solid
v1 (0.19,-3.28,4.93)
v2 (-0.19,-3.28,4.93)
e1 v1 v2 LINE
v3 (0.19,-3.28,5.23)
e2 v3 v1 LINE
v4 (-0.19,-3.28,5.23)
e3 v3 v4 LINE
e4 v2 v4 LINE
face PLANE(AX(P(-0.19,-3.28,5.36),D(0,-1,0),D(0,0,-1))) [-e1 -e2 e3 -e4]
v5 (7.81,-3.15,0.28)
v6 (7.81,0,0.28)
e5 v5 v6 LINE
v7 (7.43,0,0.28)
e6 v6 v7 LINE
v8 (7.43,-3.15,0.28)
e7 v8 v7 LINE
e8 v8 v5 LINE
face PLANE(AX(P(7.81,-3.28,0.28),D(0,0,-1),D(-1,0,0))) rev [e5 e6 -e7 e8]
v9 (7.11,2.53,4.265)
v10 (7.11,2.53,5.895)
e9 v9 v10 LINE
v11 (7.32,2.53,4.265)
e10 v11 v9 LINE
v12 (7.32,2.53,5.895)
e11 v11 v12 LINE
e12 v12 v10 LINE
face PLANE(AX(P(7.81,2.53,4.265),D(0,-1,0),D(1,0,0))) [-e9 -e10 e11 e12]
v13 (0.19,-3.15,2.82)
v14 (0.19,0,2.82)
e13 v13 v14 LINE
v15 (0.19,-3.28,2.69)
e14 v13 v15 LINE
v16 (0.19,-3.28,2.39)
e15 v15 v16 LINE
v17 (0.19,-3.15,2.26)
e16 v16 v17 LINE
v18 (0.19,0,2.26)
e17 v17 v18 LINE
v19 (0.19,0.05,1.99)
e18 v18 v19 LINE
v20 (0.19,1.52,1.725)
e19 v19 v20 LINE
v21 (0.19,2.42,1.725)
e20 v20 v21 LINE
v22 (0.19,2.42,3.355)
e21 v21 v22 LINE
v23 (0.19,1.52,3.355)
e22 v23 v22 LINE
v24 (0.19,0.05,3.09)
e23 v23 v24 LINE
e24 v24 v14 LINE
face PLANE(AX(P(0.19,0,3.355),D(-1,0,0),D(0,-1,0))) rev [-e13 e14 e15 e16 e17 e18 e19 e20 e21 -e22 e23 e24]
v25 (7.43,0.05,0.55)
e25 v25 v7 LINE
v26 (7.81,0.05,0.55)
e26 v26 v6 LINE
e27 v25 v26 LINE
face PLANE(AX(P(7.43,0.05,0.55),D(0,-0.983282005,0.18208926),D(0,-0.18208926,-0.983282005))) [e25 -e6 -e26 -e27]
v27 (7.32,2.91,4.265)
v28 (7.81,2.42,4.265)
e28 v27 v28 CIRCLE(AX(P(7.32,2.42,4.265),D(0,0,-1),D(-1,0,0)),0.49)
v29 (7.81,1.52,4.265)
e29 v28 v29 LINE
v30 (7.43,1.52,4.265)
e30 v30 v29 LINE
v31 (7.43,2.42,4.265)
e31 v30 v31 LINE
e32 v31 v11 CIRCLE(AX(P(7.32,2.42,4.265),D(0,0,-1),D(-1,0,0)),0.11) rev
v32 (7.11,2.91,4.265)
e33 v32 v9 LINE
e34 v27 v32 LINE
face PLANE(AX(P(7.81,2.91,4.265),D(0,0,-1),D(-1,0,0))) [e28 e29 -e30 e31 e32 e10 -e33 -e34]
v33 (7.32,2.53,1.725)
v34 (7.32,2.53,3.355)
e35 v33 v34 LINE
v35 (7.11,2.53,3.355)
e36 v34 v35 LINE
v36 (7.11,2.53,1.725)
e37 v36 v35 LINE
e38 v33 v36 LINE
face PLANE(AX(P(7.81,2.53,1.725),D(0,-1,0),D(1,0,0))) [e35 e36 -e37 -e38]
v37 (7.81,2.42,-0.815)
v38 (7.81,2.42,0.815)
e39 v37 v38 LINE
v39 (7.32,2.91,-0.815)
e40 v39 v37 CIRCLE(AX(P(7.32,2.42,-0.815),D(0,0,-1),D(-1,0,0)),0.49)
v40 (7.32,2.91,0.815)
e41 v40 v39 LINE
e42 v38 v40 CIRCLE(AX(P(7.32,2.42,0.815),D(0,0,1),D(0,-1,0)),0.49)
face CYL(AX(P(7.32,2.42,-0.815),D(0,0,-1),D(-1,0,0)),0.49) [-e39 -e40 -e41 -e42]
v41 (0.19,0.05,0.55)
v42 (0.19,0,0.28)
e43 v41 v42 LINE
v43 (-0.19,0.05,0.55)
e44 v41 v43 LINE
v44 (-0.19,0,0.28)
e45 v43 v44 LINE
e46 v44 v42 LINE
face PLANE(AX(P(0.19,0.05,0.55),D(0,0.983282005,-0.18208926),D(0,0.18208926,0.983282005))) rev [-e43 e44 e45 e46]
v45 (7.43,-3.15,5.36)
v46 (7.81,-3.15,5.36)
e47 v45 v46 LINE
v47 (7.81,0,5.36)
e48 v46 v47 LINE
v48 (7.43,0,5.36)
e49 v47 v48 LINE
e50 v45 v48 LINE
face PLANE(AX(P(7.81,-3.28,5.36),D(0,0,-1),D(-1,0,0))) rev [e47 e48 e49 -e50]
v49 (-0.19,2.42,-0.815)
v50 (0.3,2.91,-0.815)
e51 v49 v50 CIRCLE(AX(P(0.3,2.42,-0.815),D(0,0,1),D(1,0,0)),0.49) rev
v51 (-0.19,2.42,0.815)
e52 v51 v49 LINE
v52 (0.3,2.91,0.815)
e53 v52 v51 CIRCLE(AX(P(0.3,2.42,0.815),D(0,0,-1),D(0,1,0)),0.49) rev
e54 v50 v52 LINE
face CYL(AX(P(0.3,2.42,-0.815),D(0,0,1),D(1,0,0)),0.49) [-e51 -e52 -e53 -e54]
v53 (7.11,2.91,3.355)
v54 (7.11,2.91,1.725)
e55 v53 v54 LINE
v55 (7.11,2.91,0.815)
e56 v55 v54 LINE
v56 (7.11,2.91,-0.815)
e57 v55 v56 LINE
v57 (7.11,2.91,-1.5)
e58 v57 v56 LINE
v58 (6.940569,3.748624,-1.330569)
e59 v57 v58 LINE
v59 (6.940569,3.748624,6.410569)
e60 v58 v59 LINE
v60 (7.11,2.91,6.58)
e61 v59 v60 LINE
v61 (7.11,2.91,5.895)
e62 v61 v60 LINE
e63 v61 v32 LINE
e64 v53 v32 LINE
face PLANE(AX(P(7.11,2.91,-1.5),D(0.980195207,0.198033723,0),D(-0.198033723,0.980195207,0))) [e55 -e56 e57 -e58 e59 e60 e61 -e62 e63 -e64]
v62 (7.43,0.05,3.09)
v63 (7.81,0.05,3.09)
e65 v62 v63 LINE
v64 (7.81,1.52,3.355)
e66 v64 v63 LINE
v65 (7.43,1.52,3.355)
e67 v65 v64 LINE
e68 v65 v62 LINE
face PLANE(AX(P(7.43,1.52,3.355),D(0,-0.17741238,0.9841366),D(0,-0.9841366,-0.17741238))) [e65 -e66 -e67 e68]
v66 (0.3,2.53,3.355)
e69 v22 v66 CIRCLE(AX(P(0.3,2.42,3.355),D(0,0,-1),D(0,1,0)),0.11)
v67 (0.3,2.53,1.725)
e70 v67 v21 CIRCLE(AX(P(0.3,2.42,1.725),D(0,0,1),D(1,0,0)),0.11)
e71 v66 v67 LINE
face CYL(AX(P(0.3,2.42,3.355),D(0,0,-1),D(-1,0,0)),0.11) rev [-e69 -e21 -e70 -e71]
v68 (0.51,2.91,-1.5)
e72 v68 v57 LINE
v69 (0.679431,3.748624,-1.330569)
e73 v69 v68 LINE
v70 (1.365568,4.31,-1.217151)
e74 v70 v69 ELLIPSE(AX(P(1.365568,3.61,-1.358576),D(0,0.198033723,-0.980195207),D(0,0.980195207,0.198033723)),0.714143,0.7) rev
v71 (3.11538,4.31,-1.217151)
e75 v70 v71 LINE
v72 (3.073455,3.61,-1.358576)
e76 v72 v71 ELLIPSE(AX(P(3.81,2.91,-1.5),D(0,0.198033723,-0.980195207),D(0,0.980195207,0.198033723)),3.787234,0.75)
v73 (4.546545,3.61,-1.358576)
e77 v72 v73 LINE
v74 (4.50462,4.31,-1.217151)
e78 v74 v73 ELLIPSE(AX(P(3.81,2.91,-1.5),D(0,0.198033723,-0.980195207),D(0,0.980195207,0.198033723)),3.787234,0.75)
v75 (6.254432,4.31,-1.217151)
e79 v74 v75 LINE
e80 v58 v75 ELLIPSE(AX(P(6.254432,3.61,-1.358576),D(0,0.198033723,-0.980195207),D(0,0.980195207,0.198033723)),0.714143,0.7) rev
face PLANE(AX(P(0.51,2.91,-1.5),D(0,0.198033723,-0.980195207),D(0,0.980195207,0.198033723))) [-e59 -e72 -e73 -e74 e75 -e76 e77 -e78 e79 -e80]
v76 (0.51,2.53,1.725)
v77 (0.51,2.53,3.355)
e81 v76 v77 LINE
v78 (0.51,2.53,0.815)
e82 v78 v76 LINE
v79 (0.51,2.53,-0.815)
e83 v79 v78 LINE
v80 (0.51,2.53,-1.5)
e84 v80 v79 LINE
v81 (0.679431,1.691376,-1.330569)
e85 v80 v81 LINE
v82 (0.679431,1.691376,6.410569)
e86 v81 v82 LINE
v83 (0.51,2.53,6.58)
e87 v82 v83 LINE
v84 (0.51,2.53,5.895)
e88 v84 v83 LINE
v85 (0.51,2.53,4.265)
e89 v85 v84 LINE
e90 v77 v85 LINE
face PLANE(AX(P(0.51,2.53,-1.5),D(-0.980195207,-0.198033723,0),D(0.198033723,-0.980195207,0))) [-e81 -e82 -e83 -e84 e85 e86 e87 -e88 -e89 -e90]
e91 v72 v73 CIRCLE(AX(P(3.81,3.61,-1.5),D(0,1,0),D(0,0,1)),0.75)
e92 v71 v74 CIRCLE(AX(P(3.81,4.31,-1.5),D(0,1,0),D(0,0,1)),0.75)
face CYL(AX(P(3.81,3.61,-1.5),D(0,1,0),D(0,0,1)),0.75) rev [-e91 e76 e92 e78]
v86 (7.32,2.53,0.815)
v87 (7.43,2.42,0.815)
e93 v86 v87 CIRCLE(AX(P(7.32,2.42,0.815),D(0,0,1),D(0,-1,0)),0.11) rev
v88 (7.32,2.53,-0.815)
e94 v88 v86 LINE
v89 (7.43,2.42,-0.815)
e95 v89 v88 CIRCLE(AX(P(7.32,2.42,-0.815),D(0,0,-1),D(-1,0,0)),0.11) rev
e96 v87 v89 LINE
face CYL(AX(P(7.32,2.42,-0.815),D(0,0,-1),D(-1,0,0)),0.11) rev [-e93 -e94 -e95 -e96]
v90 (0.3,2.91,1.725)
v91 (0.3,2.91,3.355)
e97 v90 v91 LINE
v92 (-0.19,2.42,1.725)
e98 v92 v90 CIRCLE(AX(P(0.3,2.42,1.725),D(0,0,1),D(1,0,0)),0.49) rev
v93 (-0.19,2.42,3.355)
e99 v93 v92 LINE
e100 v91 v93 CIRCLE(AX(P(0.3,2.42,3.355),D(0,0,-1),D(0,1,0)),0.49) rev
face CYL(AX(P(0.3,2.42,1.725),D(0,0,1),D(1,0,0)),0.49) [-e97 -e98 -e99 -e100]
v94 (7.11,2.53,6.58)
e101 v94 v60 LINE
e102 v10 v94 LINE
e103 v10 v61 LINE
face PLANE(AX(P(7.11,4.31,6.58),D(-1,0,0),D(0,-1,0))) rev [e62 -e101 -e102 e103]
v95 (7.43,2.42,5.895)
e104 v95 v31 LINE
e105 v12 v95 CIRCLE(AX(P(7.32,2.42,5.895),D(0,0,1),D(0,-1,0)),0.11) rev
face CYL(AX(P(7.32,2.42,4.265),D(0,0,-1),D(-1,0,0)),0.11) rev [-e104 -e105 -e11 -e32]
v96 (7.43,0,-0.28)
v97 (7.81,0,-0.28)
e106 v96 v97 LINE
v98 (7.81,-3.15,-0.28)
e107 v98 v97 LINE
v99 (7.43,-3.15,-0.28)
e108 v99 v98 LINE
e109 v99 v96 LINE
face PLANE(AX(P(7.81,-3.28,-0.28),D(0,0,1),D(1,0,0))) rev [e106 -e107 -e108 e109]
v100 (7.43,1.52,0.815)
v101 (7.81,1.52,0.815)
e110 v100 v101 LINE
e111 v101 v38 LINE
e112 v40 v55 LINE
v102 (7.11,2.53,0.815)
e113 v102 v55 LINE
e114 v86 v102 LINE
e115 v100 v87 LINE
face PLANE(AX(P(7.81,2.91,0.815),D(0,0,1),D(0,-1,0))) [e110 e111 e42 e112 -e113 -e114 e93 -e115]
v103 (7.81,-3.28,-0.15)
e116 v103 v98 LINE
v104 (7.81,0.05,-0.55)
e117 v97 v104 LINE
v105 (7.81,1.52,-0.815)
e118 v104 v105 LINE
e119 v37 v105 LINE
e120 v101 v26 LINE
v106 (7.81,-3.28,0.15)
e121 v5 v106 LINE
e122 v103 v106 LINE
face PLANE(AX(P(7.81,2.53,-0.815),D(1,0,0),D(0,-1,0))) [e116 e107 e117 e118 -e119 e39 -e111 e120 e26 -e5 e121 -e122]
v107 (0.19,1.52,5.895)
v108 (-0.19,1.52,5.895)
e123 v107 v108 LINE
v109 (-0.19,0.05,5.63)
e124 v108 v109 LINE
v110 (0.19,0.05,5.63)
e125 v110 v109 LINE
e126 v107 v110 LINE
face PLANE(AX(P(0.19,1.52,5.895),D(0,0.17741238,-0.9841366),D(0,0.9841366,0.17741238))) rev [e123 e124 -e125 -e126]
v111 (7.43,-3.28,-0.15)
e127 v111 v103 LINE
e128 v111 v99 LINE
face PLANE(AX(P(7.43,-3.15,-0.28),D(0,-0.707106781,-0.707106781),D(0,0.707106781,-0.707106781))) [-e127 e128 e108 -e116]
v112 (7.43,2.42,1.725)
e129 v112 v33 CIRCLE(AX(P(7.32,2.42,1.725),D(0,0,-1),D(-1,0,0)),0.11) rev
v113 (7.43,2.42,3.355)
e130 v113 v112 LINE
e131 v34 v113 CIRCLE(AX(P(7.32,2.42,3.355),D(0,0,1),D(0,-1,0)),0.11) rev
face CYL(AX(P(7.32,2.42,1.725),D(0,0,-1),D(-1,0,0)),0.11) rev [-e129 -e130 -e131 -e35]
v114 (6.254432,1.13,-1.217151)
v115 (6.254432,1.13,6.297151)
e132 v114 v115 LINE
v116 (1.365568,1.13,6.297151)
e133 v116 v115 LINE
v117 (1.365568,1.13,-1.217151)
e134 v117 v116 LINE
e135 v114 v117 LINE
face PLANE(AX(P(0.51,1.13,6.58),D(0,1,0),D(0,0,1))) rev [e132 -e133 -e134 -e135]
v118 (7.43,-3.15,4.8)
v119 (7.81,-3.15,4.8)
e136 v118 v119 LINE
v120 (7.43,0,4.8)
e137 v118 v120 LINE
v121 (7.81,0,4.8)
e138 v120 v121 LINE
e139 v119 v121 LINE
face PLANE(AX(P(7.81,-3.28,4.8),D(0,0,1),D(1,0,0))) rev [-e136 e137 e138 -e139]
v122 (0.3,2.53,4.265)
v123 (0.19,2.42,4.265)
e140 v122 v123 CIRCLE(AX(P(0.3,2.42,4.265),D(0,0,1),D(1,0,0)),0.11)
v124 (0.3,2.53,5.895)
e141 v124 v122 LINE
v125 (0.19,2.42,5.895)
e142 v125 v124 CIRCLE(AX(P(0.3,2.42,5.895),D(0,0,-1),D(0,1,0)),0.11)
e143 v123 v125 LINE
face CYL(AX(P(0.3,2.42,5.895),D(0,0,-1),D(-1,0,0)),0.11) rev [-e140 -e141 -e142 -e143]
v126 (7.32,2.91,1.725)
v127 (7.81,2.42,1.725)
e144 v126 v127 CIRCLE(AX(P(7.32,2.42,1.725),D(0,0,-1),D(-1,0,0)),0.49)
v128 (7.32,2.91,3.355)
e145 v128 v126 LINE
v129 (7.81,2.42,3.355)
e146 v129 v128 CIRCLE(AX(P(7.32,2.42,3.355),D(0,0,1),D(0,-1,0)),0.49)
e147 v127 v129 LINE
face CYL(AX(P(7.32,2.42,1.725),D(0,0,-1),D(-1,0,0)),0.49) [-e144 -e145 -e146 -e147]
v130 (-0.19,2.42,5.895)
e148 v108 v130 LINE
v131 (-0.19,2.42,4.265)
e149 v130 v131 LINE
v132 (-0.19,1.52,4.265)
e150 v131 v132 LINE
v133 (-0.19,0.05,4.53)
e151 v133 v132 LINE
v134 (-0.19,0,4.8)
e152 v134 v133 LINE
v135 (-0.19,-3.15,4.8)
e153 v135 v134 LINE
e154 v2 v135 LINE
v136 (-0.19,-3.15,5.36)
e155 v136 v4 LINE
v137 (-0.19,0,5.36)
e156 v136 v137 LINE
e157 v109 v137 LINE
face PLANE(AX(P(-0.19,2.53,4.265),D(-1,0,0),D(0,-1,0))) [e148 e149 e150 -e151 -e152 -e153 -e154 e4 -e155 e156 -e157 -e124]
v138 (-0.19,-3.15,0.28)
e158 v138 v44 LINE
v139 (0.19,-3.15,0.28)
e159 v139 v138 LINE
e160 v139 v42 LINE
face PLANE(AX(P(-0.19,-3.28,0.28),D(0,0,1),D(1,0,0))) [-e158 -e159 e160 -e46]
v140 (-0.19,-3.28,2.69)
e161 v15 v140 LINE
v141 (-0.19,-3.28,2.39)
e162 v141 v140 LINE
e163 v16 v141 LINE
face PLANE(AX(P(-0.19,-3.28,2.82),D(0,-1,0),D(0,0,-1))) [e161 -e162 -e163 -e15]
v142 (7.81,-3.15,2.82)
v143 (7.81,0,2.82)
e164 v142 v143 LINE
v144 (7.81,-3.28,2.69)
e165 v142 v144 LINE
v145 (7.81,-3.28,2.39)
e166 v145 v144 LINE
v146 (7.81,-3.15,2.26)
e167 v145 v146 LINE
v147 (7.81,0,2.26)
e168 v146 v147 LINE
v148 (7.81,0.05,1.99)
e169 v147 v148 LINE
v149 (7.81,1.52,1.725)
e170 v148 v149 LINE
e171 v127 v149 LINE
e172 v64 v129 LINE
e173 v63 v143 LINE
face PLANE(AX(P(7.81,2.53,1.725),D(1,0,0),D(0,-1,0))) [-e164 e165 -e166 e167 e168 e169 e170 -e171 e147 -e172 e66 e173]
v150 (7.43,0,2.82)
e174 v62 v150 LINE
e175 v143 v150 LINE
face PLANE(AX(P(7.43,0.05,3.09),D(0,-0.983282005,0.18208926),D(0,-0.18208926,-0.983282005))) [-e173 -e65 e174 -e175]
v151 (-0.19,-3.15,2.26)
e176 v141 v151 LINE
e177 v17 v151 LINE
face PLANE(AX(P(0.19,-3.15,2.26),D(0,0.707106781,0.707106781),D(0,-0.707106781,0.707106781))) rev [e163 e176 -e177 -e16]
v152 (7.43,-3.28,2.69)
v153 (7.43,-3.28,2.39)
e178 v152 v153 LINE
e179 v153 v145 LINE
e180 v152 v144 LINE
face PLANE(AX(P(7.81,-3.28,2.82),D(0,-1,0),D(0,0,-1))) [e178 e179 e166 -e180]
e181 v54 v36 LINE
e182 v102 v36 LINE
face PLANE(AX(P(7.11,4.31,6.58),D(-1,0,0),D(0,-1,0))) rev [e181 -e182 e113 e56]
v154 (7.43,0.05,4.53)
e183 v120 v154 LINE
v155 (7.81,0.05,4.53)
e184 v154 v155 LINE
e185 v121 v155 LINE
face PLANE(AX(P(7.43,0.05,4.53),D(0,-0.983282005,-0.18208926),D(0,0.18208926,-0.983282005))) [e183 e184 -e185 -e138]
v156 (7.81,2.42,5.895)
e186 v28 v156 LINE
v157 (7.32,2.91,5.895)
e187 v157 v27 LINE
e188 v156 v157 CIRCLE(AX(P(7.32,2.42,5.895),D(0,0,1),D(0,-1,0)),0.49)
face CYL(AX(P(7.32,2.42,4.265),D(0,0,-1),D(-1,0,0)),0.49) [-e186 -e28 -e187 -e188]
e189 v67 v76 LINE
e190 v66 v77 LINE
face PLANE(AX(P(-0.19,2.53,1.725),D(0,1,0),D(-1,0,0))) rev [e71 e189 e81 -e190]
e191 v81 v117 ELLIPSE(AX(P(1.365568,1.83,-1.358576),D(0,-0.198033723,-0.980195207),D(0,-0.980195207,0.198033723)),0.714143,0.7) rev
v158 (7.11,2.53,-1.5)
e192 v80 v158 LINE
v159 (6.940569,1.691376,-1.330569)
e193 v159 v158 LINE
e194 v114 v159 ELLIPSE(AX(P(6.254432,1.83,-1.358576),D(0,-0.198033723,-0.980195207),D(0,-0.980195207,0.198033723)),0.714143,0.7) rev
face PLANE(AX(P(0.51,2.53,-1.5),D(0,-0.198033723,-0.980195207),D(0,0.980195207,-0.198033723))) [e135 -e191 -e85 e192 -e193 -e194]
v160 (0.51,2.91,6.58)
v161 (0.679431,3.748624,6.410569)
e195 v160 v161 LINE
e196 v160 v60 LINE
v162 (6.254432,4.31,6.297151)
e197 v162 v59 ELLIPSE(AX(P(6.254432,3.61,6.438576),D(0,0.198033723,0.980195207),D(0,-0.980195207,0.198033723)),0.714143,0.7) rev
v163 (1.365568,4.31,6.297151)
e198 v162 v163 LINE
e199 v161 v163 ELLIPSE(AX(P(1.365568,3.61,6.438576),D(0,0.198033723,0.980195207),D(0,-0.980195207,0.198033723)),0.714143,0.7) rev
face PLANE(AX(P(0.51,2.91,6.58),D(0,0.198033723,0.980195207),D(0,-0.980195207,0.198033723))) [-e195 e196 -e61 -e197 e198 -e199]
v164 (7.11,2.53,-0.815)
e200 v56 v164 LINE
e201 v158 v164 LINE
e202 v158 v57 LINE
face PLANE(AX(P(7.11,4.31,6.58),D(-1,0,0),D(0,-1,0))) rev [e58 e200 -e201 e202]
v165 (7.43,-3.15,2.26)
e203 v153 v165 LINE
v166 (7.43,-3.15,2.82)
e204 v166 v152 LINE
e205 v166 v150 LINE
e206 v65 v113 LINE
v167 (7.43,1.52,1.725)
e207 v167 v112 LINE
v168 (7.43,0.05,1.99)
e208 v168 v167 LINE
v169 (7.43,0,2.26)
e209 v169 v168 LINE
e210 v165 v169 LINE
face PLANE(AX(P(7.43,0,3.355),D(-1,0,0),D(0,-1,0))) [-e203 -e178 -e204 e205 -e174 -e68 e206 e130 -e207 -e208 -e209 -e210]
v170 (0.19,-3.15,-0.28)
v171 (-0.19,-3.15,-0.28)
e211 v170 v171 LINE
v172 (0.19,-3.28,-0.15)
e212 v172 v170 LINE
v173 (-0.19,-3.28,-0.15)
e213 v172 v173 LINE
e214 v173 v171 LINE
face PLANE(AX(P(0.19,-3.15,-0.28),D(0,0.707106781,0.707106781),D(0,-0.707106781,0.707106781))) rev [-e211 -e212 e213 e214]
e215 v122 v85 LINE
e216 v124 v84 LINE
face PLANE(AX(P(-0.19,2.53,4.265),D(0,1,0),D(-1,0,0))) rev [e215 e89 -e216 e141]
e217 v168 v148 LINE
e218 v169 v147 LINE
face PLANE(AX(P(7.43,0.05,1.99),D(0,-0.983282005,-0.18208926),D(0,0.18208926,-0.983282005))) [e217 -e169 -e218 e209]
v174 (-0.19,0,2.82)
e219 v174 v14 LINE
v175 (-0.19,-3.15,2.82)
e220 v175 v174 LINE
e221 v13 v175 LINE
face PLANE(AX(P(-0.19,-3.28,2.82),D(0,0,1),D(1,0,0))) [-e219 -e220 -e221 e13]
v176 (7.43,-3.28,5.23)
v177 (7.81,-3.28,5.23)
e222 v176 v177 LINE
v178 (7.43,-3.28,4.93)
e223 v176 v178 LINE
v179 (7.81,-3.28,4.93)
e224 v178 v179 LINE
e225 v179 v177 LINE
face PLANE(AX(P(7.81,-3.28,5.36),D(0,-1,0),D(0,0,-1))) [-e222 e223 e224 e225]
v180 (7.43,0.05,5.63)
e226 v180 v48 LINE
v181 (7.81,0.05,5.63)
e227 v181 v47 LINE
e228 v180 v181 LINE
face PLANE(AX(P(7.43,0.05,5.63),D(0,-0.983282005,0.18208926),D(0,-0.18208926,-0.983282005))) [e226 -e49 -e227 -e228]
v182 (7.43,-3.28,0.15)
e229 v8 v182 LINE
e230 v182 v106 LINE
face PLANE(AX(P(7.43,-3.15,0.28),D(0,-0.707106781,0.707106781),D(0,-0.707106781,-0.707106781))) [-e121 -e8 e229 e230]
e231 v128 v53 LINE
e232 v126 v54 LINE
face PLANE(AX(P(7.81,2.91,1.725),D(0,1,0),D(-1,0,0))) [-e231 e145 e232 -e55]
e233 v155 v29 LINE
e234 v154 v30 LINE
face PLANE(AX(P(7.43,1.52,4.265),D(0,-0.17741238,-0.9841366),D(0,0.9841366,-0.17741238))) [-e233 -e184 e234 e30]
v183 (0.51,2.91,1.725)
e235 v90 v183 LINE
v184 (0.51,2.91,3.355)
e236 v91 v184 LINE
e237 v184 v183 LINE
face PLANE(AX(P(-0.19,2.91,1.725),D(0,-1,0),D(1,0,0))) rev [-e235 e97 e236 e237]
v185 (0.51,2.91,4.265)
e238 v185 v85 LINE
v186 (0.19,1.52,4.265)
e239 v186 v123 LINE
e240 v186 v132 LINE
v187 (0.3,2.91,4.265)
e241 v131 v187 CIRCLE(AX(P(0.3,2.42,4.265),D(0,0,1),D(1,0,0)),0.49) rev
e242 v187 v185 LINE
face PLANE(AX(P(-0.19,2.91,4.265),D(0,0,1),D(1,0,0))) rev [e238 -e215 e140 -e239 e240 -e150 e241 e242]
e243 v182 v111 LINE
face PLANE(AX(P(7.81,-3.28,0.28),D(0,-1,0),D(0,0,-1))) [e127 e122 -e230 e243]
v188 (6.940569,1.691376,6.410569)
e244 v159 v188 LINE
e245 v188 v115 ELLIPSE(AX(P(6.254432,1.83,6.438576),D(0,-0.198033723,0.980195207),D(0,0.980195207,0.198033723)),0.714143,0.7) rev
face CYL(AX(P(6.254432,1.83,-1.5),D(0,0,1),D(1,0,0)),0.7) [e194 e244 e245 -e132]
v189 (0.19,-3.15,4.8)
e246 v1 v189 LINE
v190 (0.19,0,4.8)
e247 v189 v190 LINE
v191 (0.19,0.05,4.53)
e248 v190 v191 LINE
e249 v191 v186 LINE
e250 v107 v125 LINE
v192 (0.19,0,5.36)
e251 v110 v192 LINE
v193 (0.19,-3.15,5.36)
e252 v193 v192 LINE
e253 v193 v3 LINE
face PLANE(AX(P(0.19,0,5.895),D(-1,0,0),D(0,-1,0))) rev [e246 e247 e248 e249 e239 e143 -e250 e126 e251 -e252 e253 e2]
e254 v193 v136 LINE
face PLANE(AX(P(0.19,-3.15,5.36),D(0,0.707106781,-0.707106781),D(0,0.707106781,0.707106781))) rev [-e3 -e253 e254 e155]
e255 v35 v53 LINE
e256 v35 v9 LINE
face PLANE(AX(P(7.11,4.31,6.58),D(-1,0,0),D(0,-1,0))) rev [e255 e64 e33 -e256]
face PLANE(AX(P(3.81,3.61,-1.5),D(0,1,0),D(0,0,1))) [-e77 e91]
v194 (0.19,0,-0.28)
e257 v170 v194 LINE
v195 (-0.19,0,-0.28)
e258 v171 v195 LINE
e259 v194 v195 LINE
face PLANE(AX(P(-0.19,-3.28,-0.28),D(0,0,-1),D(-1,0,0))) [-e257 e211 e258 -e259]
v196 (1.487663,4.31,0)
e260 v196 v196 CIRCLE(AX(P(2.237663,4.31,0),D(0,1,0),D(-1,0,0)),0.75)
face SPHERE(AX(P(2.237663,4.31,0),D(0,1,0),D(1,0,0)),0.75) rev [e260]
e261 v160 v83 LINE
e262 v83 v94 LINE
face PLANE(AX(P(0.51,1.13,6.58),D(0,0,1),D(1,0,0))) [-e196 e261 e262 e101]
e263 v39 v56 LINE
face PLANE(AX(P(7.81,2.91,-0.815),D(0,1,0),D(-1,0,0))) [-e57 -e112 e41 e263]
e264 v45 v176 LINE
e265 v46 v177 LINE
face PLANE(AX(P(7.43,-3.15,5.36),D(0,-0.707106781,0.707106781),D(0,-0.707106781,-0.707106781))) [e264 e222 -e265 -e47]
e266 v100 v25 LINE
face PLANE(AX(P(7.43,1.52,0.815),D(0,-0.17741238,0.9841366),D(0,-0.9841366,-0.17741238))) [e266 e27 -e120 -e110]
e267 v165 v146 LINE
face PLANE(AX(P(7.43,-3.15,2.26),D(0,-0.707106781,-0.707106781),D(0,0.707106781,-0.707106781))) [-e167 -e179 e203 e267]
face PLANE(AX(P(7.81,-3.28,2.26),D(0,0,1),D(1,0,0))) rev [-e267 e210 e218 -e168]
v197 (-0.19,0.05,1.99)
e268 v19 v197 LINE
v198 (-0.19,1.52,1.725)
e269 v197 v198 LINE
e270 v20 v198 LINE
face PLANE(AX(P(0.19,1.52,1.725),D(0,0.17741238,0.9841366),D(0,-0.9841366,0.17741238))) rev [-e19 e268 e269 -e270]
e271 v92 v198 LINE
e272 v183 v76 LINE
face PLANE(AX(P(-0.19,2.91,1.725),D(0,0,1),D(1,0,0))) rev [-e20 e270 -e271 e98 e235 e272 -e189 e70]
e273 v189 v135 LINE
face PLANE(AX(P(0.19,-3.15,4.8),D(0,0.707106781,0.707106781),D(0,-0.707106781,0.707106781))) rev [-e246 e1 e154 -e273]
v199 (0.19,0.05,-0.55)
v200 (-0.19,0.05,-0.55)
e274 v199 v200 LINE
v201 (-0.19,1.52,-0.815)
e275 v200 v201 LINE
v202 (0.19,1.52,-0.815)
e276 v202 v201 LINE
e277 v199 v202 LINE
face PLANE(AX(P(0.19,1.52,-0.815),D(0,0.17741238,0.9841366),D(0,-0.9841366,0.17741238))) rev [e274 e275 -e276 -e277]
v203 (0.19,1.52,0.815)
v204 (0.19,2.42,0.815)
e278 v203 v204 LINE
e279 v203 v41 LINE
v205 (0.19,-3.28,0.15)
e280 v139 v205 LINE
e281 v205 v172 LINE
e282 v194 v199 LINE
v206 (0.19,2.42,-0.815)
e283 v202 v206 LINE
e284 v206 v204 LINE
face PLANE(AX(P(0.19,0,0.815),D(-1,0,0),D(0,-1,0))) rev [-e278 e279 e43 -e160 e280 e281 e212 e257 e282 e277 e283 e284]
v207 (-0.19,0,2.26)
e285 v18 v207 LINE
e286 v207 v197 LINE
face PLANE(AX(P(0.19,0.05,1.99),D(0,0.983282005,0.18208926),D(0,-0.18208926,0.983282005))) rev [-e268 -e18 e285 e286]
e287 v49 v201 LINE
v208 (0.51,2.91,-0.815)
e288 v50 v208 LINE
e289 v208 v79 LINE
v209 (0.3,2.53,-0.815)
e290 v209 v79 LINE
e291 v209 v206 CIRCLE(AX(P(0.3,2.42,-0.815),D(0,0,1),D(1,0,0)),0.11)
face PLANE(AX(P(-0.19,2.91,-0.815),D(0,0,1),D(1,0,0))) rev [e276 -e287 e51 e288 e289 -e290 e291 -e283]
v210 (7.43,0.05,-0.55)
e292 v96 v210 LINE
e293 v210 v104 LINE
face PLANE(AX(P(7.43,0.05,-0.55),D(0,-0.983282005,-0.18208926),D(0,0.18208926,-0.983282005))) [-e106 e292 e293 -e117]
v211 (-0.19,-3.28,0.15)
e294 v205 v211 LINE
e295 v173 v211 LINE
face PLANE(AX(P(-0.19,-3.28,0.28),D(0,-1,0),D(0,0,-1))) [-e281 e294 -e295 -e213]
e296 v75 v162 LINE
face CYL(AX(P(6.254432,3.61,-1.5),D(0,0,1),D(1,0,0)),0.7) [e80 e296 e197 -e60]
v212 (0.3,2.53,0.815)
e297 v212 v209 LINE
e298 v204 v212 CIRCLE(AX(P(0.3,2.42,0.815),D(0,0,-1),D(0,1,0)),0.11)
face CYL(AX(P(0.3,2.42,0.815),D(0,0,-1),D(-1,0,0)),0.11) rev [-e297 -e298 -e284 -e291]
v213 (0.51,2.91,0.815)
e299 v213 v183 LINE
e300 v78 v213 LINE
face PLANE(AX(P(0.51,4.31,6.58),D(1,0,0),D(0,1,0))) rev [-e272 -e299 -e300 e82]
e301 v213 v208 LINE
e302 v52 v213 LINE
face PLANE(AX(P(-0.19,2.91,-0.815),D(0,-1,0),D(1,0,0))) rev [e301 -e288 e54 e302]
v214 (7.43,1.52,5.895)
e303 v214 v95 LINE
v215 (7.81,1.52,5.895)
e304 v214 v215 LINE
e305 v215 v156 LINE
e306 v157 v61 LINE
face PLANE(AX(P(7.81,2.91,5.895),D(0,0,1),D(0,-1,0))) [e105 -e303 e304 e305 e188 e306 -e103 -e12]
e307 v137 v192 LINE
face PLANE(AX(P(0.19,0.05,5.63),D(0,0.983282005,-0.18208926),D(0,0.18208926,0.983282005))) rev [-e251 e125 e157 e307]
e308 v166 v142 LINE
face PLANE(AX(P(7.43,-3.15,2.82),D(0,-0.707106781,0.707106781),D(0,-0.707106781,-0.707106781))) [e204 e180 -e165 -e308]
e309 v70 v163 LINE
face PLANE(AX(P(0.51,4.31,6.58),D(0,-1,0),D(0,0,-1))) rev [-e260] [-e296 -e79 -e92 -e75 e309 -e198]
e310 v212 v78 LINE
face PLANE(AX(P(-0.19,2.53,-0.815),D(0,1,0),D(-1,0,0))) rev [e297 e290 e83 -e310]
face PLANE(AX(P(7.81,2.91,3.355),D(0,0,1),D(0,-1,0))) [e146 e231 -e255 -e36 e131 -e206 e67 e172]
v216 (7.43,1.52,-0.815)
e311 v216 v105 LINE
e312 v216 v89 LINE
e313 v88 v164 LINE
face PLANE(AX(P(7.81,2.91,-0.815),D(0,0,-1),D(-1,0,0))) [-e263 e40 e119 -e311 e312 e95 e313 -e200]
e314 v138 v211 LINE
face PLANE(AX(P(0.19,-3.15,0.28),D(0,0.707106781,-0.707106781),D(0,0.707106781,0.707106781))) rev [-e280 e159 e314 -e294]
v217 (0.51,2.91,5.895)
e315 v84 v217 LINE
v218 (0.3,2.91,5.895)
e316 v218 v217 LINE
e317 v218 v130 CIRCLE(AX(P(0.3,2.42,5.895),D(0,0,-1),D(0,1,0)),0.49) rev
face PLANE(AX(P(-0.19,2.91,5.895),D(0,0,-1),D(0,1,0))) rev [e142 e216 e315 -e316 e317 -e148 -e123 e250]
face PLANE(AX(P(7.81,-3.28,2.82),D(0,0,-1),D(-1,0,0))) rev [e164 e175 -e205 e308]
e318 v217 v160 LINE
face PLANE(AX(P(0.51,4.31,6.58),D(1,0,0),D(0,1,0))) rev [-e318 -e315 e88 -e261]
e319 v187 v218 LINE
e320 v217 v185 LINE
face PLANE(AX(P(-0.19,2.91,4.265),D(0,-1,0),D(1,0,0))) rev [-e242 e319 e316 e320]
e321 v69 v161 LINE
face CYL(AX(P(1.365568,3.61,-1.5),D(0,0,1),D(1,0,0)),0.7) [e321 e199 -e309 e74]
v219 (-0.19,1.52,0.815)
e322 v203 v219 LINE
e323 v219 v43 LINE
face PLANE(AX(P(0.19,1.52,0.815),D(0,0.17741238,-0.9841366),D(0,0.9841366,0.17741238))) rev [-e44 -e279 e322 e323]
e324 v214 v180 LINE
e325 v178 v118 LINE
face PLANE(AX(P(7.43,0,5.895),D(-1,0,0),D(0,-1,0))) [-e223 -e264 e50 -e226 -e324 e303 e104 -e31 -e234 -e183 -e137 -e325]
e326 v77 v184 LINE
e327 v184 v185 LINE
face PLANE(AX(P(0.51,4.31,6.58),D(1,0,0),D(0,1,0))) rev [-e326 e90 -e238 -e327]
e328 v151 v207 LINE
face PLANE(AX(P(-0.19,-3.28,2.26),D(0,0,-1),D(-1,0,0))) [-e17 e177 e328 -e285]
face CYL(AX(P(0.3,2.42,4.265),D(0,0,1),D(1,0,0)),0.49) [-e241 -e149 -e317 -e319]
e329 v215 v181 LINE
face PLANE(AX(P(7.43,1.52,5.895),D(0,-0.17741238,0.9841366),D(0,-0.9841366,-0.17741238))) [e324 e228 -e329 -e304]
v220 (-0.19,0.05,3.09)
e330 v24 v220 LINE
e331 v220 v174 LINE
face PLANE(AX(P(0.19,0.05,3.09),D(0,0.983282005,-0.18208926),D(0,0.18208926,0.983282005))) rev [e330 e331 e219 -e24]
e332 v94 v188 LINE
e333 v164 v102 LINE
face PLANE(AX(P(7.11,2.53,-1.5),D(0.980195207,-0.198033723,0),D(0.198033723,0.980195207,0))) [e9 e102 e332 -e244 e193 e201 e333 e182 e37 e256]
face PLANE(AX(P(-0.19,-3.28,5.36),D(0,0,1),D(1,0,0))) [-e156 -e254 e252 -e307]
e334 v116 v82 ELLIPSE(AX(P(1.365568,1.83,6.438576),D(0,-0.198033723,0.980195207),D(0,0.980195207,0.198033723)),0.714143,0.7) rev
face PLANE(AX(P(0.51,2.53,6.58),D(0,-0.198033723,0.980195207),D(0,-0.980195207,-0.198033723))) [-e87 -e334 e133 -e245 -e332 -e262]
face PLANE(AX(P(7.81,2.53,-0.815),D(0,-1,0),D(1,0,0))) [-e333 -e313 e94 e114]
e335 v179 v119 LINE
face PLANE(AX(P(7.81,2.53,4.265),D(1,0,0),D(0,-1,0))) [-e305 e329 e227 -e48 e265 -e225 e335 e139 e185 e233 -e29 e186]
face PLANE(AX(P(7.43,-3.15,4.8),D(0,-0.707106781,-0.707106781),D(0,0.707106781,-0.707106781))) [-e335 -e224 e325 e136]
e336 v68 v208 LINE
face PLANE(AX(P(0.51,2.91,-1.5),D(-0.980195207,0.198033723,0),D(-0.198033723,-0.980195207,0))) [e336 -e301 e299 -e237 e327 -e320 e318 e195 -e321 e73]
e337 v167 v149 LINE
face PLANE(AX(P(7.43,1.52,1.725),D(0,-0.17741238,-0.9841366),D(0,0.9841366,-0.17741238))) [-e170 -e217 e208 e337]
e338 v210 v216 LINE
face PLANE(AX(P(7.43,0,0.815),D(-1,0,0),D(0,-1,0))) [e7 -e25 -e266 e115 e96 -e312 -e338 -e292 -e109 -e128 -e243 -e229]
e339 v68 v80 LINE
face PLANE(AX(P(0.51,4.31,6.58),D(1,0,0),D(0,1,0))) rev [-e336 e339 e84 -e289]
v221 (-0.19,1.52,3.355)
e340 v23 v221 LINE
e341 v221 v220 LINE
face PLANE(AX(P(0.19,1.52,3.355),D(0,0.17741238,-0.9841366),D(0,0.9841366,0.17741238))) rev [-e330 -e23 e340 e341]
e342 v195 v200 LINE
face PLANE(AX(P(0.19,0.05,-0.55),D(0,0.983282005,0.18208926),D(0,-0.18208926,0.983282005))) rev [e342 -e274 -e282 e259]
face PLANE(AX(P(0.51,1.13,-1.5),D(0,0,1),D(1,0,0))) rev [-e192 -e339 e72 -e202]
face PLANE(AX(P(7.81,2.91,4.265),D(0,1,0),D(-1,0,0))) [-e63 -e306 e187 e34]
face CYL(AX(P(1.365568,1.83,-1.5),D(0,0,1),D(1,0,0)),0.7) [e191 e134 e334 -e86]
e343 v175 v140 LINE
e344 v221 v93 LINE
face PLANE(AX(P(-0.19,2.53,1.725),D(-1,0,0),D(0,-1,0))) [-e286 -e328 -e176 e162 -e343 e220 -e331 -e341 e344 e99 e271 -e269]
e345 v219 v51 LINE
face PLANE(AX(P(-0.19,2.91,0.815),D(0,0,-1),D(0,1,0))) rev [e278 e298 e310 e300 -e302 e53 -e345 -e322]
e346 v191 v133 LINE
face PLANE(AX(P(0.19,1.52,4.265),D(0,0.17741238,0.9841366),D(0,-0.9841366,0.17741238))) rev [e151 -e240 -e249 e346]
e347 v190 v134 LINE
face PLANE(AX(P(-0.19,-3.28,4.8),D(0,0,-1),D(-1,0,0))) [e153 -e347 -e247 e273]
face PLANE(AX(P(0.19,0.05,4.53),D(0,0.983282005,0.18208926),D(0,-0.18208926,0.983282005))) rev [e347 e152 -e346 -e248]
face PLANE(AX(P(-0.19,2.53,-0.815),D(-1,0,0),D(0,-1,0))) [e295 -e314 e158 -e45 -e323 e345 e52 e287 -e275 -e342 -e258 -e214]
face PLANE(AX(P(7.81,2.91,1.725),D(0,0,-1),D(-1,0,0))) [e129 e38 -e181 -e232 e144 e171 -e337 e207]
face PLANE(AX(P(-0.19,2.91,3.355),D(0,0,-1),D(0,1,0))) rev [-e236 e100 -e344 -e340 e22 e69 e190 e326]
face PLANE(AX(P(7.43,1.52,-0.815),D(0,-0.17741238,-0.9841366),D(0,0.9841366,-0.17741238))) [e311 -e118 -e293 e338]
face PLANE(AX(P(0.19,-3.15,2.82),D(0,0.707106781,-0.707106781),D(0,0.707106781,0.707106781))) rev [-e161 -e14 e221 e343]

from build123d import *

# Parameters (mm, degrees)
BASE_EXTRUDE_DEPTH      = 6.58
BASE_EXTRUDE_DEPTH_BACK = 1.5
SKETCH1_W               = 6.6
SKETCH1_H               = 3.18
SKETCH2_OUTSIDE_W       = 10.782
SKETCH2_OUTSIDE_H       = 7.362
CUT_EXTRUDE1_DEPTH      = 12.593731065
SKETCH3_OUTSIDE_W       = 12.262
SKETCH3_OUTSIDE_H       = 7.362
CUT_EXTRUDE2_DEPTH      = 11.268032918
SKETCH5_W               = 1.63
SKETCH5_H               = 0.38
BOSS_EXTRUDE3_DEPTH     = 0.7
SKETCH6_W               = 0.38
SKETCH6_H               = 1.63
BOSS_EXTRUDE4_DEPTH     = 2.53
SKETCH4_W               = 0.38
SKETCH4_H               = 0.56
BOSS_EXTRUDE5_DEPTH     = 3.28
CUT_EXTRUDE5_DEPTH      = 0.38
FILLET1_R               = 0.49
FILLET2_R               = 0.11
FILLET1_OF_MIRROR1_R    = 0.49
FILLET2_OF_MIRROR1_R    = 0.11
LPATTERN1_START         = 0.3
LPATTERN1_OUTLINE_W     = 0.38
LPATTERN1_OUTLINE_H     = 1.63
LPATTERN1_DEPTH         = 7.02
LPATTERN1_START_2       = 1.725
LPATTERN1_2_DEPTH       = 1.63
LPATTERN1_START_3       = 4.265
LPATTERN1_3_DEPTH       = 1.63
LPATTERN1_START_4       = -0.19
LPATTERN1_4_DEPTH       = 0.38
LPATTERN1_START_5       = 7.43
LPATTERN1_5_DEPTH       = 0.38
SKETCH9_R               = 0.75
CUT_EXTRUDE6_DEPTH      = 0.7


with BuildPart() as part:
    # Sketch1 → Base-Extrude (new, two sides: drawn at the far end of the back side and taken through both)
    with BuildSketch(Plane.XY.offset(-BASE_EXTRUDE_DEPTH_BACK)):
        with Locations((3.81, 2.72)):
            Rectangle(SKETCH1_W, SKETCH1_H)
    extrude(amount=BASE_EXTRUDE_DEPTH + BASE_EXTRUDE_DEPTH_BACK)

    # Sketch2 outside → Cut-Extrude1 (cut, through all)
    with BuildSketch(Plane.XY.offset(6.58)):
        with Locations((3.81, 2.72)):
            Rectangle(SKETCH2_OUTSIDE_W, SKETCH2_OUTSIDE_H)
        with BuildLine():
            Line((0.51, 2.91), (0.679431307, 3.748623606))
            ThreePointArc((0.679431307, 3.748623606), (0.922305346, 4.151773257), (1.365567952, 4.31))
            Line((1.365567952, 4.31), (6.254432048, 4.31))
            ThreePointArc((6.254432048, 4.31), (6.697694654, 4.151773257), (6.940568693, 3.748623606))
            Line((6.940568693, 3.748623606), (7.11, 2.91))
            Line((7.11, 2.91), (7.11, 2.53))
            Line((7.11, 2.53), (6.940568693, 1.691376394))
            ThreePointArc((6.940568693, 1.691376394), (6.697694654, 1.288226743), (6.254432048, 1.13))
            Line((6.254432048, 1.13), (1.365567952, 1.13))
            ThreePointArc((1.365567952, 1.13), (0.922305346, 1.288226743), (0.679431307, 1.691376394))
            Line((0.679431307, 1.691376394), (0.51, 2.53))
            Line((0.51, 2.53), (0.51, 2.91))
        make_face(mode=Mode.SUBTRACT)
    extrude(amount=-CUT_EXTRUDE1_DEPTH, mode=Mode.SUBTRACT)

    # Sketch3 outside → Cut-Extrude2 (cut, through all)
    with BuildSketch(Plane(origin=(7.11, 0, 0), x_dir=(0, 0, -1), z_dir=(1, 0, 0))):
        with Locations((-2.54, 2.72)):
            Rectangle(SKETCH3_OUTSIDE_W, SKETCH3_OUTSIDE_H)
        Polygon((1.5, 2.91), (1.134316679, 4.72), (-6.214316679, 4.72), (-6.58, 2.91), (-6.58, 2.53), (-6.214316679, 0.72), (1.134316679, 0.72), (1.5, 2.53), align=None, mode=Mode.SUBTRACT)
    extrude(amount=-CUT_EXTRUDE2_DEPTH, mode=Mode.SUBTRACT)

    # Sketch5 → Boss-Extrude3 (add)
    with BuildSketch(Plane.ZY.offset(-0.51)):
        with Locations((0, 2.72)):
            Rectangle(SKETCH5_W, SKETCH5_H)
    boss_extrude3 = extrude(amount=BOSS_EXTRUDE3_DEPTH)

    # Sketch8 → Cut-Revolve1 (revolve, cut)
    with BuildSketch(Plane.XY):
        with BuildLine():
            Line((2.237663013, 3.56), (2.237663013, 4.31))
            Line((2.237663013, 4.31), (2.987663013, 4.31))
            ThreePointArc((2.987663013, 4.31), (2.767993099, 3.779669914), (2.237663013, 3.56))
        make_face()
    revolve(axis=Axis((2.237663013, 4.928970116, 0), (0, -1, 0)), mode=Mode.SUBTRACT)

    # Sketch6 → Boss-Extrude4 (add)
    with BuildSketch(Plane.XZ.offset(-2.53)):
        Rectangle(SKETCH6_W, SKETCH6_H)
    boss_extrude4 = extrude(amount=BOSS_EXTRUDE4_DEPTH)

    # Sketch4 → Boss-Extrude5 (add)
    with BuildSketch(Plane(origin=(0, 0, 0), x_dir=(1, 0, 0), z_dir=(0, 1, 0))):
        Rectangle(SKETCH4_W, SKETCH4_H)
    boss_extrude5 = extrude(amount=-BOSS_EXTRUDE5_DEPTH)

    # Sketch7 → Cut-Extrude5 (cut)
    with BuildSketch(Plane.ZY.offset(0.19)):
        Polygon((0.815, 1.52), (0.55, 0.05), (0.28, 0), (0.28, -3.15), (0.15, -3.28), (-0.15, -3.28), (-0.28, -3.15), (-0.28, 0), (-0.55, 0.05), (-0.815, 1.52), (-0.815, -3.78), (0.815, -3.78), align=None)
    cut_extrude5 = extrude(amount=-CUT_EXTRUDE5_DEPTH, mode=Mode.SUBTRACT)

    # Fillet1
    fillet1_edges = [part.edges().sort_by_distance(p)[0] for p in [
        (-0.19, 2.91, 0),
    ]]
    fillet(fillet1_edges, radius=FILLET1_R)

    # Fillet2
    fillet2_edges = [part.edges().sort_by_distance(p)[0] for p in [
        (0.19, 2.53, 0),
    ]]
    fillet(fillet2_edges, radius=FILLET2_R)

    # Mirror1: Boss-Extrude3, Boss-Extrude4, Boss-Extrude5, Cut-Extrude5 across plane
    add(boss_extrude3.mirror(Plane.ZY.offset(-3.81)))
    add(boss_extrude4.mirror(Plane.ZY.offset(-3.81)))
    add(boss_extrude5.mirror(Plane.ZY.offset(-3.81)))
    add(cut_extrude5.mirror(Plane.ZY.offset(-3.81)), mode=Mode.SUBTRACT)

    # Fillet1 of Mirror1
    fillet1_of_mirror1_edges = [part.edges().sort_by_distance(p)[0] for p in [
        (7.81, 2.91, 0),
    ]]
    fillet(fillet1_of_mirror1_edges, radius=FILLET1_OF_MIRROR1_R)

    # Fillet2 of Mirror1
    fillet2_of_mirror1_edges = [part.edges().sort_by_distance(p)[0] for p in [
        (7.43, 2.53, 0),
    ]]
    fillet(fillet2_of_mirror1_edges, radius=FILLET2_OF_MIRROR1_R)

    # LPattern1: read off the stored shape, not the designer's step
    # LPattern1 outline → LPattern1 (add)
    with BuildSketch(Plane.YZ.offset(LPATTERN1_START)):
        with Locations((2.72, 5.08)):
            Rectangle(LPATTERN1_OUTLINE_W, LPATTERN1_OUTLINE_H)
        with Locations((2.72, 2.54)):
            Rectangle(LPATTERN1_OUTLINE_W, LPATTERN1_OUTLINE_H)
    extrude(amount=LPATTERN1_DEPTH)

    # LPattern1 2 outline → LPattern1 2 (add)
    with BuildSketch(Plane.XY.offset(LPATTERN1_START_2)):
        with BuildLine():
            Line((7.43, -3.28), (7.81, -3.28))
            Line((7.81, -3.28), (7.81, 2.42))
            ThreePointArc((7.81, 2.42), (7.666482323, 2.766482323), (7.32, 2.91))
            Line((7.32, 2.91), (7.32, 2.53))
            ThreePointArc((7.32, 2.53), (7.397781746, 2.497781746), (7.43, 2.42))
            Line((7.43, 2.42), (7.43, -3.28))
        make_face()
        with BuildLine():
            Line((-0.19, 2.42), (-0.19, -3.28))
            Line((-0.19, -3.28), (0.19, -3.28))
            Line((0.19, -3.28), (0.19, 2.42))
            ThreePointArc((0.19, 2.42), (0.222218254, 2.497781746), (0.3, 2.53))
            Line((0.3, 2.53), (0.3, 2.91))
            ThreePointArc((0.3, 2.91), (-0.046482323, 2.766482323), (-0.19, 2.42))
        make_face()
    extrude(amount=LPATTERN1_2_DEPTH)

    # LPattern1 3 outline → LPattern1 3 (add)
    with BuildSketch(Plane.XY.offset(LPATTERN1_START_3)):
        with BuildLine():
            Line((7.43, -3.28), (7.81, -3.28))
            Line((7.81, -3.28), (7.81, 2.42))
            ThreePointArc((7.81, 2.42), (7.666482323, 2.766482323), (7.32, 2.91))
            Line((7.32, 2.91), (7.32, 2.53))
            ThreePointArc((7.32, 2.53), (7.397781746, 2.497781746), (7.43, 2.42))
            Line((7.43, 2.42), (7.43, -3.28))
        make_face()
        with BuildLine():
            Line((-0.19, 2.42), (-0.19, -3.28))
            Line((-0.19, -3.28), (0.19, -3.28))
            Line((0.19, -3.28), (0.19, 2.42))
            ThreePointArc((0.19, 2.42), (0.222218254, 2.497781746), (0.3, 2.53))
            Line((0.3, 2.53), (0.3, 2.91))
            ThreePointArc((0.3, 2.91), (-0.046482323, 2.766482323), (-0.19, 2.42))
        make_face()
    extrude(amount=LPATTERN1_3_DEPTH)

    # LPattern1 4 outline → LPattern1 4 (cut)
    with BuildSketch(Plane.YZ.offset(LPATTERN1_START_4)):
        Polygon((-3.28, 5.23), (-3.15, 5.36), (0, 5.36), (0.05, 5.63), (1.52, 5.895), (-3.28, 5.895), align=None)
        Polygon((-3.15, 4.8), (-3.28, 4.93), (-3.28, 4.265), (1.52, 4.265), (0.05, 4.53), (0, 4.8), align=None)
        Polygon((-3.28, 2.69), (-3.15, 2.82), (0, 2.82), (0.05, 3.09), (1.52, 3.355), (-3.28, 3.355), align=None)
        Polygon((-3.15, 2.26), (-3.28, 2.39), (-3.28, 1.725), (1.52, 1.725), (0.05, 1.99), (0, 2.26), align=None)
    extrude(amount=LPATTERN1_4_DEPTH, mode=Mode.SUBTRACT)

    # LPattern1 5 outline → LPattern1 5 (cut)
    with BuildSketch(Plane.YZ.offset(LPATTERN1_START_5)):
        Polygon((-3.28, 5.23), (-3.15, 5.36), (0, 5.36), (0.05, 5.63), (1.52, 5.895), (-3.28, 5.895), align=None)
        Polygon((-3.15, 4.8), (-3.28, 4.93), (-3.28, 4.265), (1.52, 4.265), (0.05, 4.53), (0, 4.8), align=None)
        Polygon((-3.28, 2.69), (-3.15, 2.82), (0, 2.82), (0.05, 3.09), (1.52, 3.355), (-3.28, 3.355), align=None)
        Polygon((-3.15, 2.26), (-3.28, 2.39), (-3.28, 1.725), (1.52, 1.725), (0.05, 1.99), (0, 2.26), align=None)
    extrude(amount=LPATTERN1_5_DEPTH, mode=Mode.SUBTRACT)

    # Sketch9 → Cut-Extrude6 (cut)
    with BuildSketch(Plane(origin=(0, 4.31, 0), x_dir=(-1, 0, 0), z_dir=(0, 1, 0))):
        with Locations((-3.81, -1.5)):
            Circle(SKETCH9_R)
    extrude(amount=-CUT_EXTRUDE6_DEPTH, mode=Mode.SUBTRACT)


solid = part.part
